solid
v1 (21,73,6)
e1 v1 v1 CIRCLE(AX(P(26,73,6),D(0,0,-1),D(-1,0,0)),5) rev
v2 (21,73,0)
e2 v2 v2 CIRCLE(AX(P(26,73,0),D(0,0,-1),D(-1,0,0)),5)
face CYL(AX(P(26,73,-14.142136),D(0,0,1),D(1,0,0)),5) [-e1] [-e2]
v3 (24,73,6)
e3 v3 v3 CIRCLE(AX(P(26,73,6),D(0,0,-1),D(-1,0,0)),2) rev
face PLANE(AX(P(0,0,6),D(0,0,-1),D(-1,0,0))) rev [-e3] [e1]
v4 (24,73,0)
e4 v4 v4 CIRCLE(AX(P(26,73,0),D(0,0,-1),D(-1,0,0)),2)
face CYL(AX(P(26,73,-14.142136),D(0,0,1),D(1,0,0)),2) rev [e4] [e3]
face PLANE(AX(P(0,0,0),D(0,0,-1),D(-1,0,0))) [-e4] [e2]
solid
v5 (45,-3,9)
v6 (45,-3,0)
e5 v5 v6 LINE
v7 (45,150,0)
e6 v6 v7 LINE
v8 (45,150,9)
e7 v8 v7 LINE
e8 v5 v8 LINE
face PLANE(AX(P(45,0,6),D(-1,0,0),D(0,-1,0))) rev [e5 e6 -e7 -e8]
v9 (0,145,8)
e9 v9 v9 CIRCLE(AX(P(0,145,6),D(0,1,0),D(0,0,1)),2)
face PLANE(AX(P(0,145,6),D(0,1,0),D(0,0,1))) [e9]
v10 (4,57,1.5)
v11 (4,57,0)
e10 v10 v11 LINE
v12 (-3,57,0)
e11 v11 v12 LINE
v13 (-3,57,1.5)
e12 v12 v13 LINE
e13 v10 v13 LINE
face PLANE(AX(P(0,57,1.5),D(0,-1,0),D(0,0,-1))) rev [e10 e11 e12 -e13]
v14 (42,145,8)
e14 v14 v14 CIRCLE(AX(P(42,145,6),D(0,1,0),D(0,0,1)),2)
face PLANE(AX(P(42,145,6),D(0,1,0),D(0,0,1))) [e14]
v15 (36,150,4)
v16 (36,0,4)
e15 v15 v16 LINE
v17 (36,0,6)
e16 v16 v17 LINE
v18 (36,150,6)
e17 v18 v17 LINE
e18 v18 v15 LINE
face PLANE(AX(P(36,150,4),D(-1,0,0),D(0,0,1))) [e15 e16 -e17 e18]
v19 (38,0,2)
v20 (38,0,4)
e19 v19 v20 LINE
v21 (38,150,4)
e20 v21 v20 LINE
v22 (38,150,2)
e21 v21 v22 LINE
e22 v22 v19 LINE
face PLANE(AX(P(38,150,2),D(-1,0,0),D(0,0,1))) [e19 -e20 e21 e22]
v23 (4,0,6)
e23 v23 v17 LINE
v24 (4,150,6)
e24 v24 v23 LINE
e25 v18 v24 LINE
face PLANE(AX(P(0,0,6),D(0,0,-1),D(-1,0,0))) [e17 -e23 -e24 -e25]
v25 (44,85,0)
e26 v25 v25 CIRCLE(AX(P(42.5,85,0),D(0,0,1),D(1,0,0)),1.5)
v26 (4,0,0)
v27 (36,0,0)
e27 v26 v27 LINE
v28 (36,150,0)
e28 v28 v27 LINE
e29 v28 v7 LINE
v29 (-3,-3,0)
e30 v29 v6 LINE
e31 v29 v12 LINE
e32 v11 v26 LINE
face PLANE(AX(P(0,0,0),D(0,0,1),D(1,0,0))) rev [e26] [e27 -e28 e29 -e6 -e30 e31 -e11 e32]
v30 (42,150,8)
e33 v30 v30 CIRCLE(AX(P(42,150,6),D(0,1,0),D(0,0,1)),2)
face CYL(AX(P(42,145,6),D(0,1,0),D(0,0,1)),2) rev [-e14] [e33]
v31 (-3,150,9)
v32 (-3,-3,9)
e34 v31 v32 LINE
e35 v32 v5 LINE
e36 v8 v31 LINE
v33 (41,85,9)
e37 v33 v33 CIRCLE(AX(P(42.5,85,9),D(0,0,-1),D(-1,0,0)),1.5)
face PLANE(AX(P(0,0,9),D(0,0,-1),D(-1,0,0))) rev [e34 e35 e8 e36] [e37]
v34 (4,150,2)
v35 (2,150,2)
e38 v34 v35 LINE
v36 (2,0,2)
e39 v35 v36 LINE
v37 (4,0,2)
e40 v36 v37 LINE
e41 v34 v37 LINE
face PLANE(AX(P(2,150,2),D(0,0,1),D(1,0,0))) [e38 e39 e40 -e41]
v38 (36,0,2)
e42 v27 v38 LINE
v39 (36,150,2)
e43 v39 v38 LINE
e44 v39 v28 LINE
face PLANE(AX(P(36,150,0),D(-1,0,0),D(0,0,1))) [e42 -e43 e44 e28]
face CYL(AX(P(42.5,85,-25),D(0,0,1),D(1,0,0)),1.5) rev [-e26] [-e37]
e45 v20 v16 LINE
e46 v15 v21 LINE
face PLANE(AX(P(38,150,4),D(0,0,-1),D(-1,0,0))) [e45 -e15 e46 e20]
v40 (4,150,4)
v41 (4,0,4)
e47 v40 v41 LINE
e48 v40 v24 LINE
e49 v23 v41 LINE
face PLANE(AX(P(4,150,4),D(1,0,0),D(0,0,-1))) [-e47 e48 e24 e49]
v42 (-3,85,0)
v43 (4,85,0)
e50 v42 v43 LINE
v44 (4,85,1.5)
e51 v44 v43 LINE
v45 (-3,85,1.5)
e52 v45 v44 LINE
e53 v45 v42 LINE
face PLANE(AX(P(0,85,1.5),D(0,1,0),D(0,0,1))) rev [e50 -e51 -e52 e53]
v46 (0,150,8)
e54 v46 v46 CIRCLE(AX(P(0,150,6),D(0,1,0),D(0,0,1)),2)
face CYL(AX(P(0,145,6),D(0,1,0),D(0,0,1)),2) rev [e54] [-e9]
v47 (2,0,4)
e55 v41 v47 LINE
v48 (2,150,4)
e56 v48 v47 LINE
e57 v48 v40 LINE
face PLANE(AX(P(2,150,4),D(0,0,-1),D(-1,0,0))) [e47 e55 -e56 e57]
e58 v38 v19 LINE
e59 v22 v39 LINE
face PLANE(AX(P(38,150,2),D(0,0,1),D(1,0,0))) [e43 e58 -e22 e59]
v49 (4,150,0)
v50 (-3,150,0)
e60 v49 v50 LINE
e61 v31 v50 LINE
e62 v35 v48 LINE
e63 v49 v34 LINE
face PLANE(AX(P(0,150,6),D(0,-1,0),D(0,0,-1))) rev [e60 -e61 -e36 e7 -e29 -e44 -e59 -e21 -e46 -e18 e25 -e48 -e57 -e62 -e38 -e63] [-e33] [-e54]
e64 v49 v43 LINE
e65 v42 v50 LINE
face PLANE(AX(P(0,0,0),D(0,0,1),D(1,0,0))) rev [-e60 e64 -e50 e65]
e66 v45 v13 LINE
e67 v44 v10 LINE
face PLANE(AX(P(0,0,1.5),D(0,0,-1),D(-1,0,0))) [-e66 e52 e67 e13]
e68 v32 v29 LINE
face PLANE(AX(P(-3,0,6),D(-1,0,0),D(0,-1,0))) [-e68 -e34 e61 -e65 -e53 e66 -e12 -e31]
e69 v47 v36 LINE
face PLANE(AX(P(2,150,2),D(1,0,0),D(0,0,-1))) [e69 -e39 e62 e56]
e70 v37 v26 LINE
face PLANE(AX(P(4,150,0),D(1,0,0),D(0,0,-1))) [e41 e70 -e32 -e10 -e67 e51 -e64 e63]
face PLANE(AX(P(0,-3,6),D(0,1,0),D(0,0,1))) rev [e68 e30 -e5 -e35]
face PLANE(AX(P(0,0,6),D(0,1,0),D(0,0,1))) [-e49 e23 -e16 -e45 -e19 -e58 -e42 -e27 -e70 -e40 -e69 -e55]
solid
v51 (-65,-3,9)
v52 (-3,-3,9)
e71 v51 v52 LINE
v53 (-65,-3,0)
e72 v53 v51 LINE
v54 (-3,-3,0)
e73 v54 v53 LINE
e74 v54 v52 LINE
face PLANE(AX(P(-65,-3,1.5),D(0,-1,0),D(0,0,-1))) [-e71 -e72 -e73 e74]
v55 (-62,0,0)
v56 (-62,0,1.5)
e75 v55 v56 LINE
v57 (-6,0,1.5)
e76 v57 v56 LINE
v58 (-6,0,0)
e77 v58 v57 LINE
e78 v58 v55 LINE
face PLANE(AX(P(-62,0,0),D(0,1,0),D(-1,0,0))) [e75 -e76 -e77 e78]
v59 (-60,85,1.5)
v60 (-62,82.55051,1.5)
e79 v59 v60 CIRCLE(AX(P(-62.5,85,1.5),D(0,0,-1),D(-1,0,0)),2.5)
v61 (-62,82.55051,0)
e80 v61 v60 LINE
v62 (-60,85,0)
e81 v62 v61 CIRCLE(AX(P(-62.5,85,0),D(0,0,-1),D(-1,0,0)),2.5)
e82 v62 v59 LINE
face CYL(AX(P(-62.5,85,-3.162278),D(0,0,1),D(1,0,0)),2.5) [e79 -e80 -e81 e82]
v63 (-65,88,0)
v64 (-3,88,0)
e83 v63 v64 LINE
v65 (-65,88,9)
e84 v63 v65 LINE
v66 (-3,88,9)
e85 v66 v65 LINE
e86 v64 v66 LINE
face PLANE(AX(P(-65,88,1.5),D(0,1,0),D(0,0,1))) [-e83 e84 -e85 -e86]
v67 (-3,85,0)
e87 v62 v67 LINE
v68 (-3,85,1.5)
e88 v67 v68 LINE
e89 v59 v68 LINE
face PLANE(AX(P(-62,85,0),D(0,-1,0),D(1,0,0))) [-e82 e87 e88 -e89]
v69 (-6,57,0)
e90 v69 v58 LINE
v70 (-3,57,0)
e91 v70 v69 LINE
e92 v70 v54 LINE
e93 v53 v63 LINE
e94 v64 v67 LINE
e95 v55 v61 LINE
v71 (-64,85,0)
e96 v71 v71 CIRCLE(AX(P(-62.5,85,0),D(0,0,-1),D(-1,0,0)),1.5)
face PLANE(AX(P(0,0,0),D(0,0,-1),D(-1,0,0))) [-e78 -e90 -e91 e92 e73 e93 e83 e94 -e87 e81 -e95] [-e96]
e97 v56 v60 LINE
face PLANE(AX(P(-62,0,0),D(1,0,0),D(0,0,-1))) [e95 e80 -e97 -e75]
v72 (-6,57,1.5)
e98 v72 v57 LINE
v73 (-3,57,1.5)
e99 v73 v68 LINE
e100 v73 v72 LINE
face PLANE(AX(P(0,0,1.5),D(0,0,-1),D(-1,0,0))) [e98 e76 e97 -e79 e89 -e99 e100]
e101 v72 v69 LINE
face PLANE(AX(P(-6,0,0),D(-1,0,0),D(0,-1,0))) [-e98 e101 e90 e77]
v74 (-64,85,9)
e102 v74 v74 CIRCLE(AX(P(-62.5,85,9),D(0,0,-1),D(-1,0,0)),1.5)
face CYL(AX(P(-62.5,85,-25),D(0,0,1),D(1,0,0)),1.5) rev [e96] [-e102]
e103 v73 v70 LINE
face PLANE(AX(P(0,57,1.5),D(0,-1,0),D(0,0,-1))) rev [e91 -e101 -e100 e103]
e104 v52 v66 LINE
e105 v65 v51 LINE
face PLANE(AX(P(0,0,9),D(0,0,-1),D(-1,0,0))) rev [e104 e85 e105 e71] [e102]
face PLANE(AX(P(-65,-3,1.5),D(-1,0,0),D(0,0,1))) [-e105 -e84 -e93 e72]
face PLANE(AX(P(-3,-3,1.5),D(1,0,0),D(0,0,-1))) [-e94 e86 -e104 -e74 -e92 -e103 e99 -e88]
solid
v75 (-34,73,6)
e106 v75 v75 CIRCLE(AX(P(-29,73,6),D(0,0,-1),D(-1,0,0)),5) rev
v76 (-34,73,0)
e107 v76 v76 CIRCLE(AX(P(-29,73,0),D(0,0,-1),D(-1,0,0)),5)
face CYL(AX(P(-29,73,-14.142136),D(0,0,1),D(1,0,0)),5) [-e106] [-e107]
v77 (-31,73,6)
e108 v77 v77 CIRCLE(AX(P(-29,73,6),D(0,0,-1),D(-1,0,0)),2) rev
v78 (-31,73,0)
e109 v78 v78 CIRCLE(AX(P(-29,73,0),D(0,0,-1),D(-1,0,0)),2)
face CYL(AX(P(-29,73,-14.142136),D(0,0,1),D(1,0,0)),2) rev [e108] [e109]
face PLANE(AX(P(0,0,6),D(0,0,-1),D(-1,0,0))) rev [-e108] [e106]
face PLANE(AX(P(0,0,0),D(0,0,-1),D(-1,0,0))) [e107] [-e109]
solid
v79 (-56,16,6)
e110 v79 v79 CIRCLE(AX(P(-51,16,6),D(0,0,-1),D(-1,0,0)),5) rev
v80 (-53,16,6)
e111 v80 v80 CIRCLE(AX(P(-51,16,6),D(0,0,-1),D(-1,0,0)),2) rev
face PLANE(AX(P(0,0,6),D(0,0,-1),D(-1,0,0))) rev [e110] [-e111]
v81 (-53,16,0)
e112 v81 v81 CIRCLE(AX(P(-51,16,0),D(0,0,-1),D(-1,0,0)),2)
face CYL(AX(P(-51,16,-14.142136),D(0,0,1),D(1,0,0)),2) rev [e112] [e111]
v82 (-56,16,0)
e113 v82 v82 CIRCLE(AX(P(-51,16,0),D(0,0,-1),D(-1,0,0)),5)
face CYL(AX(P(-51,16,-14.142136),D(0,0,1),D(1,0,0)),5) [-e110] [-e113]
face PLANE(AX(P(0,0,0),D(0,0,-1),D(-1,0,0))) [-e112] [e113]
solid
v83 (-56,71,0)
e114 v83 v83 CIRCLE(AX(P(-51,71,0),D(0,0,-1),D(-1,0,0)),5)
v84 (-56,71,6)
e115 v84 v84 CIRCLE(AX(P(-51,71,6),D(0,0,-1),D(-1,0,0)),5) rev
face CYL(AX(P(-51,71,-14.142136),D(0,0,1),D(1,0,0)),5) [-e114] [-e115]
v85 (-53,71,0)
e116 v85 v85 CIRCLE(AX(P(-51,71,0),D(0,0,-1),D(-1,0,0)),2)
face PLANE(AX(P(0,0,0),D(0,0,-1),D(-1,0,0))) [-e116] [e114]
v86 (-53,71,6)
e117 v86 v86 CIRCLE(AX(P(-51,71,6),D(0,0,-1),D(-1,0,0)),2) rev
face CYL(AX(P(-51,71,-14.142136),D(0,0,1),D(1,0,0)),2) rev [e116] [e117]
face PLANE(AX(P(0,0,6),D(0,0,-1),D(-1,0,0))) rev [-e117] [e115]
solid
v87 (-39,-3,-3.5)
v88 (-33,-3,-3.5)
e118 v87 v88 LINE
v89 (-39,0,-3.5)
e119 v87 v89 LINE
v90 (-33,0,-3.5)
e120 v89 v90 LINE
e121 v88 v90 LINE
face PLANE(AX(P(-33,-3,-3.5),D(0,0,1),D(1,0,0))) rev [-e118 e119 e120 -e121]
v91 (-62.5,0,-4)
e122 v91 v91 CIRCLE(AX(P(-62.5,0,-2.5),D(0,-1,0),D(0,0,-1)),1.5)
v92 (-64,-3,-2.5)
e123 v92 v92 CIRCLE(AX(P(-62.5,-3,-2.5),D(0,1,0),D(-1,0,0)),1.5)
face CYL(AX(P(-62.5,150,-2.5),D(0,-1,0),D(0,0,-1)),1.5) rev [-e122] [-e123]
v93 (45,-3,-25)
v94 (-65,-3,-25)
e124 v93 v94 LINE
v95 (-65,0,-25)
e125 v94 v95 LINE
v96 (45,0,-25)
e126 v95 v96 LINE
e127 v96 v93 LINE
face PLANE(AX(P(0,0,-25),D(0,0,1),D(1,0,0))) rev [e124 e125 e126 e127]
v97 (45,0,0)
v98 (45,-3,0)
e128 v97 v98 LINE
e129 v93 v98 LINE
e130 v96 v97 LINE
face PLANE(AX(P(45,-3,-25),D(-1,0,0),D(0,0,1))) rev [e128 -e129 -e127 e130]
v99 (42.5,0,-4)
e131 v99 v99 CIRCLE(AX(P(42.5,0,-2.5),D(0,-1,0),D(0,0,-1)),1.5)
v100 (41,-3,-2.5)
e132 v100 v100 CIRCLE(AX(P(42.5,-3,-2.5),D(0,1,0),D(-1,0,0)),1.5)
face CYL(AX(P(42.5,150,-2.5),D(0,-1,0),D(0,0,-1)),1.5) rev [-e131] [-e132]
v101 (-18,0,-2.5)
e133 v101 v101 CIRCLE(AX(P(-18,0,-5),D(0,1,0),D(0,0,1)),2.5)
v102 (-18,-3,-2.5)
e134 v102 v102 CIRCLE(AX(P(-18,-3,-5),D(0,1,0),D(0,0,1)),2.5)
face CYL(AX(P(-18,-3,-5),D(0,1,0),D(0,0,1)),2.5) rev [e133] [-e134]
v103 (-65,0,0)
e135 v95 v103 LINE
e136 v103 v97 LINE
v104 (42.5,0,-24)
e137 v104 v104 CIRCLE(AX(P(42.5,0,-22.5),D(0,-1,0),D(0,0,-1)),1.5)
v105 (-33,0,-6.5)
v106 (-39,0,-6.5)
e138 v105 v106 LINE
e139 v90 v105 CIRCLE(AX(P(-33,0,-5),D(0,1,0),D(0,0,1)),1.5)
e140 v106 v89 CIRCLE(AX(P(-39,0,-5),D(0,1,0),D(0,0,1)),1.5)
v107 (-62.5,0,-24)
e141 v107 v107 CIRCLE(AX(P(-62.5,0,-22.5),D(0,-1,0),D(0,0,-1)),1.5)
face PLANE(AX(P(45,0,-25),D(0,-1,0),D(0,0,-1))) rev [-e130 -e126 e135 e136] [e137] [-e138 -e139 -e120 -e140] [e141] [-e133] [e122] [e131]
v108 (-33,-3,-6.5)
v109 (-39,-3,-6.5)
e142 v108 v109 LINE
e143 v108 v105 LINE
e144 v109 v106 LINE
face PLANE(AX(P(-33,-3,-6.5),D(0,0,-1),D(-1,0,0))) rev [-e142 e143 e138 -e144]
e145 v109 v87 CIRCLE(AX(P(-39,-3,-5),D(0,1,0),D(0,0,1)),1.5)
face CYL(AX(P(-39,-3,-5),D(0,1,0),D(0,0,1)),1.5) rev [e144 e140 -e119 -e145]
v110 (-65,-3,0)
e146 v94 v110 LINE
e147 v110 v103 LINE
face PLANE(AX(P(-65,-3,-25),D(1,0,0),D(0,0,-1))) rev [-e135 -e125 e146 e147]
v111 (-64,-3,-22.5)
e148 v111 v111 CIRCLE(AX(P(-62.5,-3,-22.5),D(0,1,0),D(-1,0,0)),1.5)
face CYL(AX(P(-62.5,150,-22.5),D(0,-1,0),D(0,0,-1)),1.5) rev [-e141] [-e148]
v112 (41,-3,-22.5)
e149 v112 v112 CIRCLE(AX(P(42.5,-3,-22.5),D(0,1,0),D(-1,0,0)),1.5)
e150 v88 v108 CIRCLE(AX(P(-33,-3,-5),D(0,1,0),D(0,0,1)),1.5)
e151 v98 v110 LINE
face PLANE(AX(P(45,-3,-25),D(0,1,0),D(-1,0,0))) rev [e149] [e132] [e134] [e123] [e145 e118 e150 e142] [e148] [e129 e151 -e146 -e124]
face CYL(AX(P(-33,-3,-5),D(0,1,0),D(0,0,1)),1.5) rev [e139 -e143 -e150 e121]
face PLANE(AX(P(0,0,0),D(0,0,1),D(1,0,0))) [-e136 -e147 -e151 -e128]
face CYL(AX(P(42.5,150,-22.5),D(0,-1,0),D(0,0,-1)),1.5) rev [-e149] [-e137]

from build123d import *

# Parameters (mm, degrees)
P_IDAT_VYSUNUT_M1_DEPTH           = 6
SKICA2_W                          = 48
SKICA2_H                          = 153
P_IDAT_VYSUNUT_M2_DEPTH           = 3
SKICA5_W                          = 62
SKICA5_H                          = 91
P_IDAT_VYSUNUT_M4_DEPTH           = 7.5
SKICA7_W                          = 62
SKICA7_H                          = 91
SKICA7_W_2                        = 56
SKICA7_H_2                        = 85
P_IDAT_VYSUNUT_M5_DEPTH           = 1.5
P_IDAT_VYSUNUT_M6_DEPTH           = 153
SKICA9_W                          = 7
SKICA9_H                          = 28
SKICA9_W_2                        = 3
ODEBRAT_VYSUNUT_M2_DEPTH          = 1.5
SKICA10_W                         = 110
SKICA10_H                         = 3
P_IDAT_VYSUNUT_M7_DEPTH           = 25
SKICA11_R                         = 2.5
ODEBRAT_VYSUNUT_M3_DEPTH          = 166.378354085
VYSUNOUT_START                    = -4.5
VYSUNOUT_TENKOST_NN_1_OUTLINE_R   = 5
VYSUNOUT_TENKOST_NN_1_OUTLINE_R_2 = 2
VYSUNOUT_TENKOST_NN_1_DEPTH       = 6
SKICA13_R                         = 2
ODEBRAT_VYSUNUT_M4_DEPTH          = 5
ODEBRAT_VYSUNUT_M6_DEPTH          = 169.104134393
ODEBRAT_VYSUNUT_M6_DEPTH_BACK     = 169.104134393
SKICA14_R                         = 1.5
ODEBRAT_VYSUNUT_M7_DEPTH          = 167.976046186
ODEBRAT_VYSUNUT_M7_DEPTH_BACK     = 167.976046186
SKICA15_R                         = 1.5
P_IDAT_VYSUNUT_M8_DEPTH           = 1.5


# Read off the part's stored shape, not the designer's step: Vysunout tenkostěnný1
with BuildPart() as part:
    # Skica1 → Přidat vysunutím1 (new body)
    with BuildSketch(Plane.XY):
        Polygon((40, -3), (45, -3), (45, 150), (40, 150), (40, 0), (0, 0), (0, 150), (-3, 150), (-3, -3), (0, -3), align=None)
    extrude(amount=P_IDAT_VYSUNUT_M1_DEPTH)

    # Skica2 → Přidat vysunutím2 (add)
    with BuildSketch(Plane.XY.offset(6)):
        with Locations((21, 73.5)):
            Rectangle(SKICA2_W, SKICA2_H)
    extrude(amount=P_IDAT_VYSUNUT_M2_DEPTH)

    # Skica3 → Přidat vysunutím6 (add, through all)
    with BuildSketch(Plane.XZ.offset(3)):
        Polygon((0, 0), (4, 0), (4, 2), (2, 2), (2, 4), (4, 4), (4, 6), (0, 6), align=None)
        Polygon((40, 0), (36, 0), (36, 2), (38, 2), (38, 4), (36, 4), (36, 6), (40, 6), align=None)
    extrude(amount=-P_IDAT_VYSUNUT_M6_DEPTH)


with BuildPart() as body_2:
    # Skica5 → Přidat vysunutím4 (new body)
    with BuildSketch(Plane.XY.offset(9)):
        with Locations((-34, 42.5)):
            Rectangle(SKICA5_W, SKICA5_H)
    extrude(amount=-P_IDAT_VYSUNUT_M4_DEPTH)

    # Skica7 → Přidat vysunutím5 (add, through all)
    with BuildSketch(Plane(origin=(0, 0, 1.5), x_dir=(-1, 0, 0), z_dir=(0, 0, -1))):
        with Locations((34, 42.5)):
            Rectangle(SKICA7_W, SKICA7_H)
        with Locations((34, 42.5)):
            Rectangle(SKICA7_W_2, SKICA7_H_2, mode=Mode.SUBTRACT)
    extrude(amount=P_IDAT_VYSUNUT_M5_DEPTH)


with BuildPart() as odebrat_vysunut_m2_tool:
    # Skica9 → Odebrat vysunutím2 (new body)
    with BuildSketch(Plane(origin=(0, 0, 0), x_dir=(-1, 0, 0), z_dir=(0, 0, -1))):
        with Locations((-0.5, 71)):
            Rectangle(SKICA9_W, SKICA9_H)
        with Locations((4.5, 71)):
            Rectangle(SKICA9_W_2, SKICA9_H)
    extrude(amount=-ODEBRAT_VYSUNUT_M2_DEPTH)


with BuildPart() as part_1:
    add(part.part)

    # Odebrat vysunutím2: cut by odebrat_vysunut_m2_tool
    add(odebrat_vysunut_m2_tool.part, mode=Mode.SUBTRACT)

    # Skica13 → Odebrat vysunutím4 (cut)
    with BuildSketch(Plane(origin=(0, 150, 0), x_dir=(1, 0, 0), z_dir=(0, 1, 0))):
        with Locations(Location((42, -6, 0), (0, 0, 270))):
            Circle(SKICA13_R)
        with Locations(Location((0, -6, 0), (0, 0, 270))):
            Circle(SKICA13_R)
    extrude(amount=-ODEBRAT_VYSUNUT_M4_DEPTH, mode=Mode.SUBTRACT)


with BuildPart() as body_2_1:
    add(body_2.part)

    # Odebrat vysunutím2: cut by odebrat_vysunut_m2_tool
    add(odebrat_vysunut_m2_tool.part, mode=Mode.SUBTRACT)


with BuildPart() as body_3:
    # Skica10 → Přidat vysunutím7 (new body)
    with BuildSketch(Plane(origin=(0, 0, 0), x_dir=(-1, 0, 0), z_dir=(0, 0, -1))):
        with Locations((10, -1.5)):
            Rectangle(SKICA10_W, SKICA10_H)
    extrude(amount=P_IDAT_VYSUNUT_M7_DEPTH)

    # Skica11 → Odebrat vysunutím3 (cut, through all)
    with BuildSketch(Plane(origin=(0, 0, 0), x_dir=(1, 0, 0), z_dir=(0, 1, 0))):
        with Locations(Location((-18, 5, 0), (0, 0, 270))):
            Circle(SKICA11_R)
        with BuildLine():
            Line((-33, 3.5), (-39, 3.5))
            ThreePointArc((-39, 3.5), (-40.5, 5), (-39, 6.5))
            Line((-39, 6.5), (-33, 6.5))
            ThreePointArc((-33, 6.5), (-31.5, 5), (-33, 3.5))
        make_face()
    extrude(amount=-ODEBRAT_VYSUNUT_M3_DEPTH, mode=Mode.SUBTRACT)

    # Skica14 → Odebrat vysunutím6 (cut, two sides: drawn at the far end of the back side and taken through both)
    with BuildSketch(Plane.XZ.offset(3).offset(-ODEBRAT_VYSUNUT_M6_DEPTH_BACK)):
        with Locations(Location((-62.5, -2.5, 0), (0, 0, 270))):
            Circle(SKICA14_R)
        with Locations(Location((-62.5, -22.5, 0), (0, 0, 270))):
            Circle(SKICA14_R)
        with Locations(Location((42.5, -2.5, 0), (0, 0, 270))):
            Circle(SKICA14_R)
        with Locations(Location((42.5, -22.5, 0), (0, 0, 270))):
            Circle(SKICA14_R)
    extrude(amount=ODEBRAT_VYSUNUT_M6_DEPTH + ODEBRAT_VYSUNUT_M6_DEPTH_BACK, mode=Mode.SUBTRACT)


with BuildPart() as body_4:
    # Vysunout tenkostěnný1 outline → Vysunout tenkostěnný1 (new body)
    # profile 1 of 4: a face of its own
    with BuildSketch(Plane(origin=(0, 0, 1.5), x_dir=(-1, 0, 0), z_dir=(0, 0, -1)).offset(VYSUNOUT_START)):
        with Locations((51, 16)):
            Circle(VYSUNOUT_TENKOST_NN_1_OUTLINE_R)
        with Locations((51, 16)):
            Circle(VYSUNOUT_TENKOST_NN_1_OUTLINE_R_2, mode=Mode.SUBTRACT)
    # profile 2 of 4: a face of its own
    with BuildSketch(Plane(origin=(0, 0, 1.5), x_dir=(-1, 0, 0), z_dir=(0, 0, -1)).offset(VYSUNOUT_START)):
        with Locations((-26, 73)):
            Circle(VYSUNOUT_TENKOST_NN_1_OUTLINE_R)
        with Locations((-26, 73)):
            Circle(VYSUNOUT_TENKOST_NN_1_OUTLINE_R_2, mode=Mode.SUBTRACT)
    # profile 3 of 4: a face of its own
    with BuildSketch(Plane(origin=(0, 0, 1.5), x_dir=(-1, 0, 0), z_dir=(0, 0, -1)).offset(VYSUNOUT_START)):
        with Locations((29, 73)):
            Circle(VYSUNOUT_TENKOST_NN_1_OUTLINE_R)
        with Locations((29, 73)):
            Circle(VYSUNOUT_TENKOST_NN_1_OUTLINE_R_2, mode=Mode.SUBTRACT)
    # profile 4 of 4: a face of its own
    with BuildSketch(Plane(origin=(0, 0, 1.5), x_dir=(-1, 0, 0), z_dir=(0, 0, -1)).offset(VYSUNOUT_START)):
        with Locations((51, 71)):
            Circle(VYSUNOUT_TENKOST_NN_1_OUTLINE_R)
        with Locations((51, 71)):
            Circle(VYSUNOUT_TENKOST_NN_1_OUTLINE_R_2, mode=Mode.SUBTRACT)
    extrude(amount=VYSUNOUT_TENKOST_NN_1_DEPTH)


with BuildPart() as odebrat_vysunut_m7_tool:
    # Skica15 → Odebrat vysunutím7 (new, two sides: drawn at the far end of the back side and taken through both)
    with BuildSketch(Plane.XY.offset(9).offset(-ODEBRAT_VYSUNUT_M7_DEPTH_BACK)):
        with Locations((-62.5, 85)):
            Circle(SKICA15_R)
        with Locations((42.5, 85)):
            Circle(SKICA15_R)
    extrude(amount=ODEBRAT_VYSUNUT_M7_DEPTH + ODEBRAT_VYSUNUT_M7_DEPTH_BACK)


with BuildPart() as part_2:
    add(part_1.part)

    # Odebrat vysunutím7: cut by odebrat_vysunut_m7_tool
    add(odebrat_vysunut_m7_tool.part, mode=Mode.SUBTRACT)


with BuildPart() as body_2_2:
    add(body_2_1.part)

    # Odebrat vysunutím7: cut by odebrat_vysunut_m7_tool
    add(odebrat_vysunut_m7_tool.part, mode=Mode.SUBTRACT)

    # Skica16 → Přidat vysunutím8 (add)
    with BuildSketch(Plane(origin=(0, 0, 1.5), x_dir=(-1, 0, 0), z_dir=(0, 0, -1))):
        with BuildLine():
            Line((62, 82.550510257), (62, 83.585786438))
            ThreePointArc((62, 83.585786438), (61.275255129, 84.133974596), (61, 85))
            Line((61, 85), (60, 85))
            ThreePointArc((60, 85), (60.563508327, 83.41886117), (62, 82.550510257))
        make_face()
    extrude(amount=P_IDAT_VYSUNUT_M8_DEPTH)


solid = Compound([body_3.part, body_4.part, part_2.part, body_2_2.part])
